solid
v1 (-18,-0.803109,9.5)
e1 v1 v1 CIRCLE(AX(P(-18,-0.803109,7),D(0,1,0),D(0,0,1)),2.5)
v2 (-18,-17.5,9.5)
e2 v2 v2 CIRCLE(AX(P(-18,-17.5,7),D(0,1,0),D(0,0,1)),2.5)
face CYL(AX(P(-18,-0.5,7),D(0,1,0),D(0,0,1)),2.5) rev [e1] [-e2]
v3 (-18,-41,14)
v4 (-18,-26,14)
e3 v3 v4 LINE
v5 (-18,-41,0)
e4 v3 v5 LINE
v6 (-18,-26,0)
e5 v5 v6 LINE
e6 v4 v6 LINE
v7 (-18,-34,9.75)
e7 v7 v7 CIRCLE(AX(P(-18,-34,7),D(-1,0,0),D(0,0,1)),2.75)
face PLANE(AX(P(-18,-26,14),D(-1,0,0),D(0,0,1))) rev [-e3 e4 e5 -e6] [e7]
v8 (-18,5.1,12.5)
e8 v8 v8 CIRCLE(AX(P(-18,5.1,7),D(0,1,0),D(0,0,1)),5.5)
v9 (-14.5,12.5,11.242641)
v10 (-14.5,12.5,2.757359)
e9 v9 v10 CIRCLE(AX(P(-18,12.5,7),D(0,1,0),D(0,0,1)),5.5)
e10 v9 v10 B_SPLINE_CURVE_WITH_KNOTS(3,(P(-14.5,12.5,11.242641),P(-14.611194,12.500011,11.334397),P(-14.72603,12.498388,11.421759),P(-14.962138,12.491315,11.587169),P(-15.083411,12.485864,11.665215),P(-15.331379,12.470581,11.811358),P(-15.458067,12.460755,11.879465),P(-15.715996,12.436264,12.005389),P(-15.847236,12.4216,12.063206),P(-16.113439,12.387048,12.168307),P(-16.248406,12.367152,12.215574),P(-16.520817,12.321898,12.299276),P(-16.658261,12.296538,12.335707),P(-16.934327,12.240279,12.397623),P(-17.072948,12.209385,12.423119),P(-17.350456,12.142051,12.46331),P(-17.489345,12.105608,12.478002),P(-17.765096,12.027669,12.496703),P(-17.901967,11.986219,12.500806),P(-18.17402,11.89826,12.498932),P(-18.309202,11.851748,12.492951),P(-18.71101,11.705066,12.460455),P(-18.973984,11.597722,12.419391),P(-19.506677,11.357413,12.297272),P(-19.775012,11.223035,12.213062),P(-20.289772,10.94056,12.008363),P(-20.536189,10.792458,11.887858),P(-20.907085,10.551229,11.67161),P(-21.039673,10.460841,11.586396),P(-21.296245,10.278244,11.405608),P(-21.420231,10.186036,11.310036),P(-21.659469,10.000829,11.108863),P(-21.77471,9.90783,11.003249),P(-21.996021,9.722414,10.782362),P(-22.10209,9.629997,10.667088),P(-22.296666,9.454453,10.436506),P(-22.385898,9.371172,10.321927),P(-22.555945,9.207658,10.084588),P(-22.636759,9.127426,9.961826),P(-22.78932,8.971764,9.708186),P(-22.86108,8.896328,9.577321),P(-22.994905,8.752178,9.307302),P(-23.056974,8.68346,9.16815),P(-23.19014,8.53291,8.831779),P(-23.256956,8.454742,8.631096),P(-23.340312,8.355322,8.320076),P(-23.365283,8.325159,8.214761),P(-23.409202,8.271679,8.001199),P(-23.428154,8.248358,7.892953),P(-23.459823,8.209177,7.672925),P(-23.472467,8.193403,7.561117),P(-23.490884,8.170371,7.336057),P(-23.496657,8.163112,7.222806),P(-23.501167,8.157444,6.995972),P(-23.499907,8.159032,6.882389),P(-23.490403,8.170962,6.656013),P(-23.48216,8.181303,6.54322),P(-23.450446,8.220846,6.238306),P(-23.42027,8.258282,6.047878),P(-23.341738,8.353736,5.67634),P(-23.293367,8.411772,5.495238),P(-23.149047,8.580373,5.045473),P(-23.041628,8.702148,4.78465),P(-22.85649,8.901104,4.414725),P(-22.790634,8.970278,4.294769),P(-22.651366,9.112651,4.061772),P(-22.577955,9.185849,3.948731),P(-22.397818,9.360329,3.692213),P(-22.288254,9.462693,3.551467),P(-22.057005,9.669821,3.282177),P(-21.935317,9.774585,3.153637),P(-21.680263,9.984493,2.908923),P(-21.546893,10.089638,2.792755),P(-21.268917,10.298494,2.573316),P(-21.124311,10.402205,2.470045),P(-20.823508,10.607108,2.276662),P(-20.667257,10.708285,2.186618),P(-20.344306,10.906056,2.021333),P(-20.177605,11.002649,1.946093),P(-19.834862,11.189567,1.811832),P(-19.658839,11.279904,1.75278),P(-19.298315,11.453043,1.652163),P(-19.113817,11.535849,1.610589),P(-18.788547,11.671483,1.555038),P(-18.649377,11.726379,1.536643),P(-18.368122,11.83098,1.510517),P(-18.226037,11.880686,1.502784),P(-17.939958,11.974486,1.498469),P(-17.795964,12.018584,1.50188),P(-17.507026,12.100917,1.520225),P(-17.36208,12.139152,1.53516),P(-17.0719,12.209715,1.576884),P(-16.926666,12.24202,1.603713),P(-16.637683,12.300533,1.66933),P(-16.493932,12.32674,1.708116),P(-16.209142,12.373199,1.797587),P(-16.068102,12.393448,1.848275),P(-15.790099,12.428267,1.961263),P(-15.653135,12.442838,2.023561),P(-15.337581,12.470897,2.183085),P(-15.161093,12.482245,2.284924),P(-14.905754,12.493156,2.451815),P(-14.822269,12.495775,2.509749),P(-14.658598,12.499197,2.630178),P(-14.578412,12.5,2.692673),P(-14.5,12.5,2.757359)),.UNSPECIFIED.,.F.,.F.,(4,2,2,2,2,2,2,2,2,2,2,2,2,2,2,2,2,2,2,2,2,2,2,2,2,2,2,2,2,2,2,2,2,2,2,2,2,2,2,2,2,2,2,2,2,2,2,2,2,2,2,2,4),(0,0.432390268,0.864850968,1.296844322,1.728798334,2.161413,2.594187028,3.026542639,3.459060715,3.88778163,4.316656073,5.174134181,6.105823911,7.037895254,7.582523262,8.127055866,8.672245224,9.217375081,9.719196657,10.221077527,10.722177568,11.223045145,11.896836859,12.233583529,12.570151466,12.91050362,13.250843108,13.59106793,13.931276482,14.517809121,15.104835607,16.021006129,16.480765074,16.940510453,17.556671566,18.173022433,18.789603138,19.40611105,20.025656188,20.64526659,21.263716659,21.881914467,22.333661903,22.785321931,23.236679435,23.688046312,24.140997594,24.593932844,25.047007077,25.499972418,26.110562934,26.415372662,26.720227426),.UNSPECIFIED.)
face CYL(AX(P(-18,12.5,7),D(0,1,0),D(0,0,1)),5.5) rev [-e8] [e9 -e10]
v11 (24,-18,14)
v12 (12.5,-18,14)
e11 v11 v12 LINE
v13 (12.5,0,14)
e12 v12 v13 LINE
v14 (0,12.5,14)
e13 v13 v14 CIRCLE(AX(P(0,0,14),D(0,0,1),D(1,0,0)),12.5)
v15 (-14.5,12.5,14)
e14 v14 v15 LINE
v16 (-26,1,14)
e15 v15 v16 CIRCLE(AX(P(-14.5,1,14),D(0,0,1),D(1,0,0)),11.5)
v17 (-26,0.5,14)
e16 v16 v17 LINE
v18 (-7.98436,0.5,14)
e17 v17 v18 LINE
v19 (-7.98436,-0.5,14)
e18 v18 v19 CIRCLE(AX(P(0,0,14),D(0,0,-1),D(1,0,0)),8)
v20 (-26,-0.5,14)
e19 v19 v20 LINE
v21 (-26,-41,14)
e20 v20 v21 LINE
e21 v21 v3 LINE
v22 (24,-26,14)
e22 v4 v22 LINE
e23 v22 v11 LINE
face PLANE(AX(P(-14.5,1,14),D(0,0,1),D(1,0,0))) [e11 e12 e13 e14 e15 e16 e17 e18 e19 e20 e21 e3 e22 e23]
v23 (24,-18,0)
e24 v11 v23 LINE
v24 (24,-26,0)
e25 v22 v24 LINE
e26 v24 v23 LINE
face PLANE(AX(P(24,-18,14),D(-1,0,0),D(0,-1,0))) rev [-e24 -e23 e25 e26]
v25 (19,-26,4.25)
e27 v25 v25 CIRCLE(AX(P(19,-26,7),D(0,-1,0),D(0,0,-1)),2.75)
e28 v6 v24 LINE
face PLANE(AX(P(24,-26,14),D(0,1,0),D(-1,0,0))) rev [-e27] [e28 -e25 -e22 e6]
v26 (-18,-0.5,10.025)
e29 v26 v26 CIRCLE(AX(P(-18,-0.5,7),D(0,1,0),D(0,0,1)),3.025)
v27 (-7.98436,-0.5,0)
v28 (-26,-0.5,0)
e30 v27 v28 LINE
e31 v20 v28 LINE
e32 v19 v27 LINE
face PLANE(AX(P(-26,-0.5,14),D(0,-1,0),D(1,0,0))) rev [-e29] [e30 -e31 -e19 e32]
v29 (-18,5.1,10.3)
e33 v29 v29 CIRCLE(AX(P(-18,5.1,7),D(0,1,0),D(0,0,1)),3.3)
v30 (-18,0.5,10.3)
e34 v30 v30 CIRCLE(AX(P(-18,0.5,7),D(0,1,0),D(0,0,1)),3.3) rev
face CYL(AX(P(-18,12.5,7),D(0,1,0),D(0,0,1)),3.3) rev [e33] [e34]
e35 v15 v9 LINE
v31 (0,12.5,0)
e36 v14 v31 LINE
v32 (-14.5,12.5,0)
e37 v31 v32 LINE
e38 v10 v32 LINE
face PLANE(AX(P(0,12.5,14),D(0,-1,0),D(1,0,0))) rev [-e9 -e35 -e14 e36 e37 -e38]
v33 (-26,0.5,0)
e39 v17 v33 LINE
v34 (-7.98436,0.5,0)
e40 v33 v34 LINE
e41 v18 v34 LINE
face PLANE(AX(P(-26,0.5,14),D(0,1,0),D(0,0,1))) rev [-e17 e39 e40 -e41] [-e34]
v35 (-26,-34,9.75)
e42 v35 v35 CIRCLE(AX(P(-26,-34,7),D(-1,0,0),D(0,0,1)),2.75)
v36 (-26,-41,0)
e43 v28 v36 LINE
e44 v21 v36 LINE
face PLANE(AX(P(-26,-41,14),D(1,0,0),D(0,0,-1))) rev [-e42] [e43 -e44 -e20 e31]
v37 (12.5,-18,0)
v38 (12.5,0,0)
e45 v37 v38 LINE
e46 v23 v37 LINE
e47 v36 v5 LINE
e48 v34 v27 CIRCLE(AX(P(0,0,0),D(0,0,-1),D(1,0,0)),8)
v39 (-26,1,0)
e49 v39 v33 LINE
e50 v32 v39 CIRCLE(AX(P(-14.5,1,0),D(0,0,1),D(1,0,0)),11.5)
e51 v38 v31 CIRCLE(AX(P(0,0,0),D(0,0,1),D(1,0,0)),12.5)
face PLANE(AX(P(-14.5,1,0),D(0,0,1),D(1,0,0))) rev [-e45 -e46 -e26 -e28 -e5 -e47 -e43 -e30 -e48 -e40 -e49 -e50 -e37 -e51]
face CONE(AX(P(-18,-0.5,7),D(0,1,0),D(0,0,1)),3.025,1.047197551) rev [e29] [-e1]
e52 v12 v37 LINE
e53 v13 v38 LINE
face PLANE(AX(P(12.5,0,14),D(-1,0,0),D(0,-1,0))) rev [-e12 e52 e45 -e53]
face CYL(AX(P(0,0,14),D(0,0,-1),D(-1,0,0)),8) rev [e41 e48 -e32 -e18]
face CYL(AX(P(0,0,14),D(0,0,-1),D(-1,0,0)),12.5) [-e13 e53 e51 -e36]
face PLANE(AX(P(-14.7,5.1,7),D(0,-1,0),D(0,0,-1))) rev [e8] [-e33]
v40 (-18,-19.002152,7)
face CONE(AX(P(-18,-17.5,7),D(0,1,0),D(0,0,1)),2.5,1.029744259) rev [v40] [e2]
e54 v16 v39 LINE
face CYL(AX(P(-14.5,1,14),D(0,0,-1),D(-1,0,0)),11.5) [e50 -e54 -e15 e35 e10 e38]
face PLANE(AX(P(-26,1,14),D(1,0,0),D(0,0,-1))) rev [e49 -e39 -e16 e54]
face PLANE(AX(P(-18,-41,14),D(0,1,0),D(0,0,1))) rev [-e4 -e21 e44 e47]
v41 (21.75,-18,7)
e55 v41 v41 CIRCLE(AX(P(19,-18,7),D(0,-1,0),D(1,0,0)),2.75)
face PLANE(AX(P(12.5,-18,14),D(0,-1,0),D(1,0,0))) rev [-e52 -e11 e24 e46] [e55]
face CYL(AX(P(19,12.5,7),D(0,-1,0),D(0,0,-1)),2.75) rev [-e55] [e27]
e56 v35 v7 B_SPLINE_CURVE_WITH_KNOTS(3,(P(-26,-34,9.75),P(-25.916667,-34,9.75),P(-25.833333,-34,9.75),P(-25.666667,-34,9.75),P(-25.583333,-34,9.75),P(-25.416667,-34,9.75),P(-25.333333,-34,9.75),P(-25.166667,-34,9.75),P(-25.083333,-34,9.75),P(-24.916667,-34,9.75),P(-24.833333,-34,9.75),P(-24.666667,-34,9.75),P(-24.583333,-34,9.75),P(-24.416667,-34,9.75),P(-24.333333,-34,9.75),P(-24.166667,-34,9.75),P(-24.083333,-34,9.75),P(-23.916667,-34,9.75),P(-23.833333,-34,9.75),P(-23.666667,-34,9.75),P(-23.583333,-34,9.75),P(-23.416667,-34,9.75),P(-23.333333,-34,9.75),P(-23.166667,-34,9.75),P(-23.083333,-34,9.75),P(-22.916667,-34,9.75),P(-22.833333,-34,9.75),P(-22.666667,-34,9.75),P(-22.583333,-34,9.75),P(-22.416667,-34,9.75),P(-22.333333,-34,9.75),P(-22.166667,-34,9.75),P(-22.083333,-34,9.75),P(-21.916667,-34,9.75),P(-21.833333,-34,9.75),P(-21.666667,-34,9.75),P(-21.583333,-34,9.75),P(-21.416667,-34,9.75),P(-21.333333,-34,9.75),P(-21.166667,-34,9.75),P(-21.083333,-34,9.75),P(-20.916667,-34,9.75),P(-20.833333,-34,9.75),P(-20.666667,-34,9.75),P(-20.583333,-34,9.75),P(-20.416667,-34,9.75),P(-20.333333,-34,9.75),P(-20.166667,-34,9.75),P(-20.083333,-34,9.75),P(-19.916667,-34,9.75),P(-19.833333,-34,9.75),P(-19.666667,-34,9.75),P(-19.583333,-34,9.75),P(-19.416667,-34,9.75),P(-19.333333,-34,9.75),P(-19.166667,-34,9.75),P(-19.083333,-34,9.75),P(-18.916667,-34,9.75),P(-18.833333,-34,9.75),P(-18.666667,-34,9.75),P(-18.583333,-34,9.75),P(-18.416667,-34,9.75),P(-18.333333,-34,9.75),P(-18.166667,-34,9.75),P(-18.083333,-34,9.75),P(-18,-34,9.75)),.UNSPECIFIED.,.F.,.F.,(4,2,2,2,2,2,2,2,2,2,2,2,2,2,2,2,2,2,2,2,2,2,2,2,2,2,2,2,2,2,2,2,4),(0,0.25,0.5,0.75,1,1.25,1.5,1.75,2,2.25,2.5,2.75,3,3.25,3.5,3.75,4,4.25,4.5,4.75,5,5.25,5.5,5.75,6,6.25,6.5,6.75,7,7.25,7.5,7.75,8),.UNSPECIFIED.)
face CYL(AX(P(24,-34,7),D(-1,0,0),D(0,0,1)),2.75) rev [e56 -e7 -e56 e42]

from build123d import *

# Parameters (mm, degrees)
EXTRUDE_1_DEPTH               = 14
SKETCH_2_R                    = 2.75
CUT_EXTRUDE_1_DEPTH           = 49.520614176
SKETCH_3_R                    = 2.75
CUT_EXTRUDE_2_DEPTH           = 67.158899628
HOLE_START                    = 5.1
HOLE_WIZARD_M61_OUTLINE_R     = 5.5
HOLE_WIZARD_M61_DEPTH         = 7.4
HOLE_START_2                  = 0.5
HOLE_WIZARD_M61_2_OUTLINE_R   = 3.3
HOLE_WIZARD_M61_2_DEPTH       = 4.6
HOLE_WIZARD_M61_3_D           = 5
HOLE_WIZARD_M61_3_DEPTH       = 17
HOLE_WIZARD_M61_3_CSINK_D     = 6.05
HOLE_WIZARD_M61_3_CSINK_ANGLE = 120
HOLE_WIZARD_M61_3_TIP         = 1.502151548


# Read off the part's stored shape, not the designer's step: Цековка для  винта с внутренним шестигранником M61
with BuildPart() as part:
    # Эскиз1 → Бобышка-Вытянуть1 (new body)
    with BuildSketch(Plane.XY):
        with BuildLine():
            Line((-26, 0.5), (-7.984359711, 0.5))
            ThreePointArc((-7.984359711, 0.5), (8, 0), (-7.984359711, -0.5))
            Line((-7.984359711, -0.5), (-26, -0.5))
            Line((-26, -0.5), (-26, -18))
            Line((-26, -18), (-26, -26))
            Line((-26, -26), (-26, -41))
            Line((-26, -41), (-18, -41))
            Line((-18, -41), (-18, -26))
            Line((-18, -26), (24, -26))
            Line((24, -26), (24, -18))
            Line((24, -18), (12.5, -18))
            Line((12.5, -18), (12.5, 0))
            ThreePointArc((12.5, 0), (8.838834765, 8.838834765), (0, 12.5))
            Line((0, 12.5), (-14.5, 12.5))
            ThreePointArc((-14.5, 12.5), (-22.631727984, 9.131727984), (-26, 1))
            Line((-26, 1), (-26, 0.5))
        make_face()
    extrude(amount=EXTRUDE_1_DEPTH)

    # Эскиз2 → Вырез-Вытянуть1 (cut, through all)
    with BuildSketch(Plane.XZ.offset(26)):
        with Locations(Location((19, 7, 0), (0, 0, 270))):
            Circle(SKETCH_2_R)
    extrude(amount=-CUT_EXTRUDE_1_DEPTH, mode=Mode.SUBTRACT)

    # Эскиз3 → Вырез-Вытянуть2 (cut, through all)
    with BuildSketch(Plane.ZY.offset(26)):
        with Locations((7, -34)):
            Circle(SKETCH_3_R)
    extrude(amount=-CUT_EXTRUDE_2_DEPTH, mode=Mode.SUBTRACT)

    # Hole Wizard M61 outline → Hole Wizard M61 (cut)
    with BuildSketch(Plane(origin=(0, 0, 0), x_dir=(1, 0, 0), z_dir=(0, 1, 0)).offset(HOLE_START)):
        with Locations((-18, -7)):
            Circle(HOLE_WIZARD_M61_OUTLINE_R)
    extrude(amount=HOLE_WIZARD_M61_DEPTH, mode=Mode.SUBTRACT)

    # Hole Wizard M61 2 outline → Hole Wizard M61 2 (cut)
    with BuildSketch(Plane(origin=(0, 0, 0), x_dir=(1, 0, 0), z_dir=(0, 1, 0)).offset(HOLE_START_2)):
        with Locations((-18, -7)):
            Circle(HOLE_WIZARD_M61_2_OUTLINE_R)
    extrude(amount=HOLE_WIZARD_M61_2_DEPTH, mode=Mode.SUBTRACT)

    # Hole Wizard M61 3
    with Locations(Plane(origin=(0, -0.5, 0), x_dir=(-1, 0, 0), z_dir=(0, 1, 0))):
        with Locations((18, 7)):
            CounterSinkHole(HOLE_WIZARD_M61_3_D / 2, HOLE_WIZARD_M61_3_CSINK_D / 2, depth=HOLE_WIZARD_M61_3_DEPTH, counter_sink_angle=HOLE_WIZARD_M61_3_CSINK_ANGLE)
            with Locations((0, 0, -(HOLE_WIZARD_M61_3_DEPTH + HOLE_WIZARD_M61_3_TIP / 2))):  # 118° drill point
                Cone(0, HOLE_WIZARD_M61_3_D / 2, HOLE_WIZARD_M61_3_TIP, mode=Mode.SUBTRACT)


solid = part.part
